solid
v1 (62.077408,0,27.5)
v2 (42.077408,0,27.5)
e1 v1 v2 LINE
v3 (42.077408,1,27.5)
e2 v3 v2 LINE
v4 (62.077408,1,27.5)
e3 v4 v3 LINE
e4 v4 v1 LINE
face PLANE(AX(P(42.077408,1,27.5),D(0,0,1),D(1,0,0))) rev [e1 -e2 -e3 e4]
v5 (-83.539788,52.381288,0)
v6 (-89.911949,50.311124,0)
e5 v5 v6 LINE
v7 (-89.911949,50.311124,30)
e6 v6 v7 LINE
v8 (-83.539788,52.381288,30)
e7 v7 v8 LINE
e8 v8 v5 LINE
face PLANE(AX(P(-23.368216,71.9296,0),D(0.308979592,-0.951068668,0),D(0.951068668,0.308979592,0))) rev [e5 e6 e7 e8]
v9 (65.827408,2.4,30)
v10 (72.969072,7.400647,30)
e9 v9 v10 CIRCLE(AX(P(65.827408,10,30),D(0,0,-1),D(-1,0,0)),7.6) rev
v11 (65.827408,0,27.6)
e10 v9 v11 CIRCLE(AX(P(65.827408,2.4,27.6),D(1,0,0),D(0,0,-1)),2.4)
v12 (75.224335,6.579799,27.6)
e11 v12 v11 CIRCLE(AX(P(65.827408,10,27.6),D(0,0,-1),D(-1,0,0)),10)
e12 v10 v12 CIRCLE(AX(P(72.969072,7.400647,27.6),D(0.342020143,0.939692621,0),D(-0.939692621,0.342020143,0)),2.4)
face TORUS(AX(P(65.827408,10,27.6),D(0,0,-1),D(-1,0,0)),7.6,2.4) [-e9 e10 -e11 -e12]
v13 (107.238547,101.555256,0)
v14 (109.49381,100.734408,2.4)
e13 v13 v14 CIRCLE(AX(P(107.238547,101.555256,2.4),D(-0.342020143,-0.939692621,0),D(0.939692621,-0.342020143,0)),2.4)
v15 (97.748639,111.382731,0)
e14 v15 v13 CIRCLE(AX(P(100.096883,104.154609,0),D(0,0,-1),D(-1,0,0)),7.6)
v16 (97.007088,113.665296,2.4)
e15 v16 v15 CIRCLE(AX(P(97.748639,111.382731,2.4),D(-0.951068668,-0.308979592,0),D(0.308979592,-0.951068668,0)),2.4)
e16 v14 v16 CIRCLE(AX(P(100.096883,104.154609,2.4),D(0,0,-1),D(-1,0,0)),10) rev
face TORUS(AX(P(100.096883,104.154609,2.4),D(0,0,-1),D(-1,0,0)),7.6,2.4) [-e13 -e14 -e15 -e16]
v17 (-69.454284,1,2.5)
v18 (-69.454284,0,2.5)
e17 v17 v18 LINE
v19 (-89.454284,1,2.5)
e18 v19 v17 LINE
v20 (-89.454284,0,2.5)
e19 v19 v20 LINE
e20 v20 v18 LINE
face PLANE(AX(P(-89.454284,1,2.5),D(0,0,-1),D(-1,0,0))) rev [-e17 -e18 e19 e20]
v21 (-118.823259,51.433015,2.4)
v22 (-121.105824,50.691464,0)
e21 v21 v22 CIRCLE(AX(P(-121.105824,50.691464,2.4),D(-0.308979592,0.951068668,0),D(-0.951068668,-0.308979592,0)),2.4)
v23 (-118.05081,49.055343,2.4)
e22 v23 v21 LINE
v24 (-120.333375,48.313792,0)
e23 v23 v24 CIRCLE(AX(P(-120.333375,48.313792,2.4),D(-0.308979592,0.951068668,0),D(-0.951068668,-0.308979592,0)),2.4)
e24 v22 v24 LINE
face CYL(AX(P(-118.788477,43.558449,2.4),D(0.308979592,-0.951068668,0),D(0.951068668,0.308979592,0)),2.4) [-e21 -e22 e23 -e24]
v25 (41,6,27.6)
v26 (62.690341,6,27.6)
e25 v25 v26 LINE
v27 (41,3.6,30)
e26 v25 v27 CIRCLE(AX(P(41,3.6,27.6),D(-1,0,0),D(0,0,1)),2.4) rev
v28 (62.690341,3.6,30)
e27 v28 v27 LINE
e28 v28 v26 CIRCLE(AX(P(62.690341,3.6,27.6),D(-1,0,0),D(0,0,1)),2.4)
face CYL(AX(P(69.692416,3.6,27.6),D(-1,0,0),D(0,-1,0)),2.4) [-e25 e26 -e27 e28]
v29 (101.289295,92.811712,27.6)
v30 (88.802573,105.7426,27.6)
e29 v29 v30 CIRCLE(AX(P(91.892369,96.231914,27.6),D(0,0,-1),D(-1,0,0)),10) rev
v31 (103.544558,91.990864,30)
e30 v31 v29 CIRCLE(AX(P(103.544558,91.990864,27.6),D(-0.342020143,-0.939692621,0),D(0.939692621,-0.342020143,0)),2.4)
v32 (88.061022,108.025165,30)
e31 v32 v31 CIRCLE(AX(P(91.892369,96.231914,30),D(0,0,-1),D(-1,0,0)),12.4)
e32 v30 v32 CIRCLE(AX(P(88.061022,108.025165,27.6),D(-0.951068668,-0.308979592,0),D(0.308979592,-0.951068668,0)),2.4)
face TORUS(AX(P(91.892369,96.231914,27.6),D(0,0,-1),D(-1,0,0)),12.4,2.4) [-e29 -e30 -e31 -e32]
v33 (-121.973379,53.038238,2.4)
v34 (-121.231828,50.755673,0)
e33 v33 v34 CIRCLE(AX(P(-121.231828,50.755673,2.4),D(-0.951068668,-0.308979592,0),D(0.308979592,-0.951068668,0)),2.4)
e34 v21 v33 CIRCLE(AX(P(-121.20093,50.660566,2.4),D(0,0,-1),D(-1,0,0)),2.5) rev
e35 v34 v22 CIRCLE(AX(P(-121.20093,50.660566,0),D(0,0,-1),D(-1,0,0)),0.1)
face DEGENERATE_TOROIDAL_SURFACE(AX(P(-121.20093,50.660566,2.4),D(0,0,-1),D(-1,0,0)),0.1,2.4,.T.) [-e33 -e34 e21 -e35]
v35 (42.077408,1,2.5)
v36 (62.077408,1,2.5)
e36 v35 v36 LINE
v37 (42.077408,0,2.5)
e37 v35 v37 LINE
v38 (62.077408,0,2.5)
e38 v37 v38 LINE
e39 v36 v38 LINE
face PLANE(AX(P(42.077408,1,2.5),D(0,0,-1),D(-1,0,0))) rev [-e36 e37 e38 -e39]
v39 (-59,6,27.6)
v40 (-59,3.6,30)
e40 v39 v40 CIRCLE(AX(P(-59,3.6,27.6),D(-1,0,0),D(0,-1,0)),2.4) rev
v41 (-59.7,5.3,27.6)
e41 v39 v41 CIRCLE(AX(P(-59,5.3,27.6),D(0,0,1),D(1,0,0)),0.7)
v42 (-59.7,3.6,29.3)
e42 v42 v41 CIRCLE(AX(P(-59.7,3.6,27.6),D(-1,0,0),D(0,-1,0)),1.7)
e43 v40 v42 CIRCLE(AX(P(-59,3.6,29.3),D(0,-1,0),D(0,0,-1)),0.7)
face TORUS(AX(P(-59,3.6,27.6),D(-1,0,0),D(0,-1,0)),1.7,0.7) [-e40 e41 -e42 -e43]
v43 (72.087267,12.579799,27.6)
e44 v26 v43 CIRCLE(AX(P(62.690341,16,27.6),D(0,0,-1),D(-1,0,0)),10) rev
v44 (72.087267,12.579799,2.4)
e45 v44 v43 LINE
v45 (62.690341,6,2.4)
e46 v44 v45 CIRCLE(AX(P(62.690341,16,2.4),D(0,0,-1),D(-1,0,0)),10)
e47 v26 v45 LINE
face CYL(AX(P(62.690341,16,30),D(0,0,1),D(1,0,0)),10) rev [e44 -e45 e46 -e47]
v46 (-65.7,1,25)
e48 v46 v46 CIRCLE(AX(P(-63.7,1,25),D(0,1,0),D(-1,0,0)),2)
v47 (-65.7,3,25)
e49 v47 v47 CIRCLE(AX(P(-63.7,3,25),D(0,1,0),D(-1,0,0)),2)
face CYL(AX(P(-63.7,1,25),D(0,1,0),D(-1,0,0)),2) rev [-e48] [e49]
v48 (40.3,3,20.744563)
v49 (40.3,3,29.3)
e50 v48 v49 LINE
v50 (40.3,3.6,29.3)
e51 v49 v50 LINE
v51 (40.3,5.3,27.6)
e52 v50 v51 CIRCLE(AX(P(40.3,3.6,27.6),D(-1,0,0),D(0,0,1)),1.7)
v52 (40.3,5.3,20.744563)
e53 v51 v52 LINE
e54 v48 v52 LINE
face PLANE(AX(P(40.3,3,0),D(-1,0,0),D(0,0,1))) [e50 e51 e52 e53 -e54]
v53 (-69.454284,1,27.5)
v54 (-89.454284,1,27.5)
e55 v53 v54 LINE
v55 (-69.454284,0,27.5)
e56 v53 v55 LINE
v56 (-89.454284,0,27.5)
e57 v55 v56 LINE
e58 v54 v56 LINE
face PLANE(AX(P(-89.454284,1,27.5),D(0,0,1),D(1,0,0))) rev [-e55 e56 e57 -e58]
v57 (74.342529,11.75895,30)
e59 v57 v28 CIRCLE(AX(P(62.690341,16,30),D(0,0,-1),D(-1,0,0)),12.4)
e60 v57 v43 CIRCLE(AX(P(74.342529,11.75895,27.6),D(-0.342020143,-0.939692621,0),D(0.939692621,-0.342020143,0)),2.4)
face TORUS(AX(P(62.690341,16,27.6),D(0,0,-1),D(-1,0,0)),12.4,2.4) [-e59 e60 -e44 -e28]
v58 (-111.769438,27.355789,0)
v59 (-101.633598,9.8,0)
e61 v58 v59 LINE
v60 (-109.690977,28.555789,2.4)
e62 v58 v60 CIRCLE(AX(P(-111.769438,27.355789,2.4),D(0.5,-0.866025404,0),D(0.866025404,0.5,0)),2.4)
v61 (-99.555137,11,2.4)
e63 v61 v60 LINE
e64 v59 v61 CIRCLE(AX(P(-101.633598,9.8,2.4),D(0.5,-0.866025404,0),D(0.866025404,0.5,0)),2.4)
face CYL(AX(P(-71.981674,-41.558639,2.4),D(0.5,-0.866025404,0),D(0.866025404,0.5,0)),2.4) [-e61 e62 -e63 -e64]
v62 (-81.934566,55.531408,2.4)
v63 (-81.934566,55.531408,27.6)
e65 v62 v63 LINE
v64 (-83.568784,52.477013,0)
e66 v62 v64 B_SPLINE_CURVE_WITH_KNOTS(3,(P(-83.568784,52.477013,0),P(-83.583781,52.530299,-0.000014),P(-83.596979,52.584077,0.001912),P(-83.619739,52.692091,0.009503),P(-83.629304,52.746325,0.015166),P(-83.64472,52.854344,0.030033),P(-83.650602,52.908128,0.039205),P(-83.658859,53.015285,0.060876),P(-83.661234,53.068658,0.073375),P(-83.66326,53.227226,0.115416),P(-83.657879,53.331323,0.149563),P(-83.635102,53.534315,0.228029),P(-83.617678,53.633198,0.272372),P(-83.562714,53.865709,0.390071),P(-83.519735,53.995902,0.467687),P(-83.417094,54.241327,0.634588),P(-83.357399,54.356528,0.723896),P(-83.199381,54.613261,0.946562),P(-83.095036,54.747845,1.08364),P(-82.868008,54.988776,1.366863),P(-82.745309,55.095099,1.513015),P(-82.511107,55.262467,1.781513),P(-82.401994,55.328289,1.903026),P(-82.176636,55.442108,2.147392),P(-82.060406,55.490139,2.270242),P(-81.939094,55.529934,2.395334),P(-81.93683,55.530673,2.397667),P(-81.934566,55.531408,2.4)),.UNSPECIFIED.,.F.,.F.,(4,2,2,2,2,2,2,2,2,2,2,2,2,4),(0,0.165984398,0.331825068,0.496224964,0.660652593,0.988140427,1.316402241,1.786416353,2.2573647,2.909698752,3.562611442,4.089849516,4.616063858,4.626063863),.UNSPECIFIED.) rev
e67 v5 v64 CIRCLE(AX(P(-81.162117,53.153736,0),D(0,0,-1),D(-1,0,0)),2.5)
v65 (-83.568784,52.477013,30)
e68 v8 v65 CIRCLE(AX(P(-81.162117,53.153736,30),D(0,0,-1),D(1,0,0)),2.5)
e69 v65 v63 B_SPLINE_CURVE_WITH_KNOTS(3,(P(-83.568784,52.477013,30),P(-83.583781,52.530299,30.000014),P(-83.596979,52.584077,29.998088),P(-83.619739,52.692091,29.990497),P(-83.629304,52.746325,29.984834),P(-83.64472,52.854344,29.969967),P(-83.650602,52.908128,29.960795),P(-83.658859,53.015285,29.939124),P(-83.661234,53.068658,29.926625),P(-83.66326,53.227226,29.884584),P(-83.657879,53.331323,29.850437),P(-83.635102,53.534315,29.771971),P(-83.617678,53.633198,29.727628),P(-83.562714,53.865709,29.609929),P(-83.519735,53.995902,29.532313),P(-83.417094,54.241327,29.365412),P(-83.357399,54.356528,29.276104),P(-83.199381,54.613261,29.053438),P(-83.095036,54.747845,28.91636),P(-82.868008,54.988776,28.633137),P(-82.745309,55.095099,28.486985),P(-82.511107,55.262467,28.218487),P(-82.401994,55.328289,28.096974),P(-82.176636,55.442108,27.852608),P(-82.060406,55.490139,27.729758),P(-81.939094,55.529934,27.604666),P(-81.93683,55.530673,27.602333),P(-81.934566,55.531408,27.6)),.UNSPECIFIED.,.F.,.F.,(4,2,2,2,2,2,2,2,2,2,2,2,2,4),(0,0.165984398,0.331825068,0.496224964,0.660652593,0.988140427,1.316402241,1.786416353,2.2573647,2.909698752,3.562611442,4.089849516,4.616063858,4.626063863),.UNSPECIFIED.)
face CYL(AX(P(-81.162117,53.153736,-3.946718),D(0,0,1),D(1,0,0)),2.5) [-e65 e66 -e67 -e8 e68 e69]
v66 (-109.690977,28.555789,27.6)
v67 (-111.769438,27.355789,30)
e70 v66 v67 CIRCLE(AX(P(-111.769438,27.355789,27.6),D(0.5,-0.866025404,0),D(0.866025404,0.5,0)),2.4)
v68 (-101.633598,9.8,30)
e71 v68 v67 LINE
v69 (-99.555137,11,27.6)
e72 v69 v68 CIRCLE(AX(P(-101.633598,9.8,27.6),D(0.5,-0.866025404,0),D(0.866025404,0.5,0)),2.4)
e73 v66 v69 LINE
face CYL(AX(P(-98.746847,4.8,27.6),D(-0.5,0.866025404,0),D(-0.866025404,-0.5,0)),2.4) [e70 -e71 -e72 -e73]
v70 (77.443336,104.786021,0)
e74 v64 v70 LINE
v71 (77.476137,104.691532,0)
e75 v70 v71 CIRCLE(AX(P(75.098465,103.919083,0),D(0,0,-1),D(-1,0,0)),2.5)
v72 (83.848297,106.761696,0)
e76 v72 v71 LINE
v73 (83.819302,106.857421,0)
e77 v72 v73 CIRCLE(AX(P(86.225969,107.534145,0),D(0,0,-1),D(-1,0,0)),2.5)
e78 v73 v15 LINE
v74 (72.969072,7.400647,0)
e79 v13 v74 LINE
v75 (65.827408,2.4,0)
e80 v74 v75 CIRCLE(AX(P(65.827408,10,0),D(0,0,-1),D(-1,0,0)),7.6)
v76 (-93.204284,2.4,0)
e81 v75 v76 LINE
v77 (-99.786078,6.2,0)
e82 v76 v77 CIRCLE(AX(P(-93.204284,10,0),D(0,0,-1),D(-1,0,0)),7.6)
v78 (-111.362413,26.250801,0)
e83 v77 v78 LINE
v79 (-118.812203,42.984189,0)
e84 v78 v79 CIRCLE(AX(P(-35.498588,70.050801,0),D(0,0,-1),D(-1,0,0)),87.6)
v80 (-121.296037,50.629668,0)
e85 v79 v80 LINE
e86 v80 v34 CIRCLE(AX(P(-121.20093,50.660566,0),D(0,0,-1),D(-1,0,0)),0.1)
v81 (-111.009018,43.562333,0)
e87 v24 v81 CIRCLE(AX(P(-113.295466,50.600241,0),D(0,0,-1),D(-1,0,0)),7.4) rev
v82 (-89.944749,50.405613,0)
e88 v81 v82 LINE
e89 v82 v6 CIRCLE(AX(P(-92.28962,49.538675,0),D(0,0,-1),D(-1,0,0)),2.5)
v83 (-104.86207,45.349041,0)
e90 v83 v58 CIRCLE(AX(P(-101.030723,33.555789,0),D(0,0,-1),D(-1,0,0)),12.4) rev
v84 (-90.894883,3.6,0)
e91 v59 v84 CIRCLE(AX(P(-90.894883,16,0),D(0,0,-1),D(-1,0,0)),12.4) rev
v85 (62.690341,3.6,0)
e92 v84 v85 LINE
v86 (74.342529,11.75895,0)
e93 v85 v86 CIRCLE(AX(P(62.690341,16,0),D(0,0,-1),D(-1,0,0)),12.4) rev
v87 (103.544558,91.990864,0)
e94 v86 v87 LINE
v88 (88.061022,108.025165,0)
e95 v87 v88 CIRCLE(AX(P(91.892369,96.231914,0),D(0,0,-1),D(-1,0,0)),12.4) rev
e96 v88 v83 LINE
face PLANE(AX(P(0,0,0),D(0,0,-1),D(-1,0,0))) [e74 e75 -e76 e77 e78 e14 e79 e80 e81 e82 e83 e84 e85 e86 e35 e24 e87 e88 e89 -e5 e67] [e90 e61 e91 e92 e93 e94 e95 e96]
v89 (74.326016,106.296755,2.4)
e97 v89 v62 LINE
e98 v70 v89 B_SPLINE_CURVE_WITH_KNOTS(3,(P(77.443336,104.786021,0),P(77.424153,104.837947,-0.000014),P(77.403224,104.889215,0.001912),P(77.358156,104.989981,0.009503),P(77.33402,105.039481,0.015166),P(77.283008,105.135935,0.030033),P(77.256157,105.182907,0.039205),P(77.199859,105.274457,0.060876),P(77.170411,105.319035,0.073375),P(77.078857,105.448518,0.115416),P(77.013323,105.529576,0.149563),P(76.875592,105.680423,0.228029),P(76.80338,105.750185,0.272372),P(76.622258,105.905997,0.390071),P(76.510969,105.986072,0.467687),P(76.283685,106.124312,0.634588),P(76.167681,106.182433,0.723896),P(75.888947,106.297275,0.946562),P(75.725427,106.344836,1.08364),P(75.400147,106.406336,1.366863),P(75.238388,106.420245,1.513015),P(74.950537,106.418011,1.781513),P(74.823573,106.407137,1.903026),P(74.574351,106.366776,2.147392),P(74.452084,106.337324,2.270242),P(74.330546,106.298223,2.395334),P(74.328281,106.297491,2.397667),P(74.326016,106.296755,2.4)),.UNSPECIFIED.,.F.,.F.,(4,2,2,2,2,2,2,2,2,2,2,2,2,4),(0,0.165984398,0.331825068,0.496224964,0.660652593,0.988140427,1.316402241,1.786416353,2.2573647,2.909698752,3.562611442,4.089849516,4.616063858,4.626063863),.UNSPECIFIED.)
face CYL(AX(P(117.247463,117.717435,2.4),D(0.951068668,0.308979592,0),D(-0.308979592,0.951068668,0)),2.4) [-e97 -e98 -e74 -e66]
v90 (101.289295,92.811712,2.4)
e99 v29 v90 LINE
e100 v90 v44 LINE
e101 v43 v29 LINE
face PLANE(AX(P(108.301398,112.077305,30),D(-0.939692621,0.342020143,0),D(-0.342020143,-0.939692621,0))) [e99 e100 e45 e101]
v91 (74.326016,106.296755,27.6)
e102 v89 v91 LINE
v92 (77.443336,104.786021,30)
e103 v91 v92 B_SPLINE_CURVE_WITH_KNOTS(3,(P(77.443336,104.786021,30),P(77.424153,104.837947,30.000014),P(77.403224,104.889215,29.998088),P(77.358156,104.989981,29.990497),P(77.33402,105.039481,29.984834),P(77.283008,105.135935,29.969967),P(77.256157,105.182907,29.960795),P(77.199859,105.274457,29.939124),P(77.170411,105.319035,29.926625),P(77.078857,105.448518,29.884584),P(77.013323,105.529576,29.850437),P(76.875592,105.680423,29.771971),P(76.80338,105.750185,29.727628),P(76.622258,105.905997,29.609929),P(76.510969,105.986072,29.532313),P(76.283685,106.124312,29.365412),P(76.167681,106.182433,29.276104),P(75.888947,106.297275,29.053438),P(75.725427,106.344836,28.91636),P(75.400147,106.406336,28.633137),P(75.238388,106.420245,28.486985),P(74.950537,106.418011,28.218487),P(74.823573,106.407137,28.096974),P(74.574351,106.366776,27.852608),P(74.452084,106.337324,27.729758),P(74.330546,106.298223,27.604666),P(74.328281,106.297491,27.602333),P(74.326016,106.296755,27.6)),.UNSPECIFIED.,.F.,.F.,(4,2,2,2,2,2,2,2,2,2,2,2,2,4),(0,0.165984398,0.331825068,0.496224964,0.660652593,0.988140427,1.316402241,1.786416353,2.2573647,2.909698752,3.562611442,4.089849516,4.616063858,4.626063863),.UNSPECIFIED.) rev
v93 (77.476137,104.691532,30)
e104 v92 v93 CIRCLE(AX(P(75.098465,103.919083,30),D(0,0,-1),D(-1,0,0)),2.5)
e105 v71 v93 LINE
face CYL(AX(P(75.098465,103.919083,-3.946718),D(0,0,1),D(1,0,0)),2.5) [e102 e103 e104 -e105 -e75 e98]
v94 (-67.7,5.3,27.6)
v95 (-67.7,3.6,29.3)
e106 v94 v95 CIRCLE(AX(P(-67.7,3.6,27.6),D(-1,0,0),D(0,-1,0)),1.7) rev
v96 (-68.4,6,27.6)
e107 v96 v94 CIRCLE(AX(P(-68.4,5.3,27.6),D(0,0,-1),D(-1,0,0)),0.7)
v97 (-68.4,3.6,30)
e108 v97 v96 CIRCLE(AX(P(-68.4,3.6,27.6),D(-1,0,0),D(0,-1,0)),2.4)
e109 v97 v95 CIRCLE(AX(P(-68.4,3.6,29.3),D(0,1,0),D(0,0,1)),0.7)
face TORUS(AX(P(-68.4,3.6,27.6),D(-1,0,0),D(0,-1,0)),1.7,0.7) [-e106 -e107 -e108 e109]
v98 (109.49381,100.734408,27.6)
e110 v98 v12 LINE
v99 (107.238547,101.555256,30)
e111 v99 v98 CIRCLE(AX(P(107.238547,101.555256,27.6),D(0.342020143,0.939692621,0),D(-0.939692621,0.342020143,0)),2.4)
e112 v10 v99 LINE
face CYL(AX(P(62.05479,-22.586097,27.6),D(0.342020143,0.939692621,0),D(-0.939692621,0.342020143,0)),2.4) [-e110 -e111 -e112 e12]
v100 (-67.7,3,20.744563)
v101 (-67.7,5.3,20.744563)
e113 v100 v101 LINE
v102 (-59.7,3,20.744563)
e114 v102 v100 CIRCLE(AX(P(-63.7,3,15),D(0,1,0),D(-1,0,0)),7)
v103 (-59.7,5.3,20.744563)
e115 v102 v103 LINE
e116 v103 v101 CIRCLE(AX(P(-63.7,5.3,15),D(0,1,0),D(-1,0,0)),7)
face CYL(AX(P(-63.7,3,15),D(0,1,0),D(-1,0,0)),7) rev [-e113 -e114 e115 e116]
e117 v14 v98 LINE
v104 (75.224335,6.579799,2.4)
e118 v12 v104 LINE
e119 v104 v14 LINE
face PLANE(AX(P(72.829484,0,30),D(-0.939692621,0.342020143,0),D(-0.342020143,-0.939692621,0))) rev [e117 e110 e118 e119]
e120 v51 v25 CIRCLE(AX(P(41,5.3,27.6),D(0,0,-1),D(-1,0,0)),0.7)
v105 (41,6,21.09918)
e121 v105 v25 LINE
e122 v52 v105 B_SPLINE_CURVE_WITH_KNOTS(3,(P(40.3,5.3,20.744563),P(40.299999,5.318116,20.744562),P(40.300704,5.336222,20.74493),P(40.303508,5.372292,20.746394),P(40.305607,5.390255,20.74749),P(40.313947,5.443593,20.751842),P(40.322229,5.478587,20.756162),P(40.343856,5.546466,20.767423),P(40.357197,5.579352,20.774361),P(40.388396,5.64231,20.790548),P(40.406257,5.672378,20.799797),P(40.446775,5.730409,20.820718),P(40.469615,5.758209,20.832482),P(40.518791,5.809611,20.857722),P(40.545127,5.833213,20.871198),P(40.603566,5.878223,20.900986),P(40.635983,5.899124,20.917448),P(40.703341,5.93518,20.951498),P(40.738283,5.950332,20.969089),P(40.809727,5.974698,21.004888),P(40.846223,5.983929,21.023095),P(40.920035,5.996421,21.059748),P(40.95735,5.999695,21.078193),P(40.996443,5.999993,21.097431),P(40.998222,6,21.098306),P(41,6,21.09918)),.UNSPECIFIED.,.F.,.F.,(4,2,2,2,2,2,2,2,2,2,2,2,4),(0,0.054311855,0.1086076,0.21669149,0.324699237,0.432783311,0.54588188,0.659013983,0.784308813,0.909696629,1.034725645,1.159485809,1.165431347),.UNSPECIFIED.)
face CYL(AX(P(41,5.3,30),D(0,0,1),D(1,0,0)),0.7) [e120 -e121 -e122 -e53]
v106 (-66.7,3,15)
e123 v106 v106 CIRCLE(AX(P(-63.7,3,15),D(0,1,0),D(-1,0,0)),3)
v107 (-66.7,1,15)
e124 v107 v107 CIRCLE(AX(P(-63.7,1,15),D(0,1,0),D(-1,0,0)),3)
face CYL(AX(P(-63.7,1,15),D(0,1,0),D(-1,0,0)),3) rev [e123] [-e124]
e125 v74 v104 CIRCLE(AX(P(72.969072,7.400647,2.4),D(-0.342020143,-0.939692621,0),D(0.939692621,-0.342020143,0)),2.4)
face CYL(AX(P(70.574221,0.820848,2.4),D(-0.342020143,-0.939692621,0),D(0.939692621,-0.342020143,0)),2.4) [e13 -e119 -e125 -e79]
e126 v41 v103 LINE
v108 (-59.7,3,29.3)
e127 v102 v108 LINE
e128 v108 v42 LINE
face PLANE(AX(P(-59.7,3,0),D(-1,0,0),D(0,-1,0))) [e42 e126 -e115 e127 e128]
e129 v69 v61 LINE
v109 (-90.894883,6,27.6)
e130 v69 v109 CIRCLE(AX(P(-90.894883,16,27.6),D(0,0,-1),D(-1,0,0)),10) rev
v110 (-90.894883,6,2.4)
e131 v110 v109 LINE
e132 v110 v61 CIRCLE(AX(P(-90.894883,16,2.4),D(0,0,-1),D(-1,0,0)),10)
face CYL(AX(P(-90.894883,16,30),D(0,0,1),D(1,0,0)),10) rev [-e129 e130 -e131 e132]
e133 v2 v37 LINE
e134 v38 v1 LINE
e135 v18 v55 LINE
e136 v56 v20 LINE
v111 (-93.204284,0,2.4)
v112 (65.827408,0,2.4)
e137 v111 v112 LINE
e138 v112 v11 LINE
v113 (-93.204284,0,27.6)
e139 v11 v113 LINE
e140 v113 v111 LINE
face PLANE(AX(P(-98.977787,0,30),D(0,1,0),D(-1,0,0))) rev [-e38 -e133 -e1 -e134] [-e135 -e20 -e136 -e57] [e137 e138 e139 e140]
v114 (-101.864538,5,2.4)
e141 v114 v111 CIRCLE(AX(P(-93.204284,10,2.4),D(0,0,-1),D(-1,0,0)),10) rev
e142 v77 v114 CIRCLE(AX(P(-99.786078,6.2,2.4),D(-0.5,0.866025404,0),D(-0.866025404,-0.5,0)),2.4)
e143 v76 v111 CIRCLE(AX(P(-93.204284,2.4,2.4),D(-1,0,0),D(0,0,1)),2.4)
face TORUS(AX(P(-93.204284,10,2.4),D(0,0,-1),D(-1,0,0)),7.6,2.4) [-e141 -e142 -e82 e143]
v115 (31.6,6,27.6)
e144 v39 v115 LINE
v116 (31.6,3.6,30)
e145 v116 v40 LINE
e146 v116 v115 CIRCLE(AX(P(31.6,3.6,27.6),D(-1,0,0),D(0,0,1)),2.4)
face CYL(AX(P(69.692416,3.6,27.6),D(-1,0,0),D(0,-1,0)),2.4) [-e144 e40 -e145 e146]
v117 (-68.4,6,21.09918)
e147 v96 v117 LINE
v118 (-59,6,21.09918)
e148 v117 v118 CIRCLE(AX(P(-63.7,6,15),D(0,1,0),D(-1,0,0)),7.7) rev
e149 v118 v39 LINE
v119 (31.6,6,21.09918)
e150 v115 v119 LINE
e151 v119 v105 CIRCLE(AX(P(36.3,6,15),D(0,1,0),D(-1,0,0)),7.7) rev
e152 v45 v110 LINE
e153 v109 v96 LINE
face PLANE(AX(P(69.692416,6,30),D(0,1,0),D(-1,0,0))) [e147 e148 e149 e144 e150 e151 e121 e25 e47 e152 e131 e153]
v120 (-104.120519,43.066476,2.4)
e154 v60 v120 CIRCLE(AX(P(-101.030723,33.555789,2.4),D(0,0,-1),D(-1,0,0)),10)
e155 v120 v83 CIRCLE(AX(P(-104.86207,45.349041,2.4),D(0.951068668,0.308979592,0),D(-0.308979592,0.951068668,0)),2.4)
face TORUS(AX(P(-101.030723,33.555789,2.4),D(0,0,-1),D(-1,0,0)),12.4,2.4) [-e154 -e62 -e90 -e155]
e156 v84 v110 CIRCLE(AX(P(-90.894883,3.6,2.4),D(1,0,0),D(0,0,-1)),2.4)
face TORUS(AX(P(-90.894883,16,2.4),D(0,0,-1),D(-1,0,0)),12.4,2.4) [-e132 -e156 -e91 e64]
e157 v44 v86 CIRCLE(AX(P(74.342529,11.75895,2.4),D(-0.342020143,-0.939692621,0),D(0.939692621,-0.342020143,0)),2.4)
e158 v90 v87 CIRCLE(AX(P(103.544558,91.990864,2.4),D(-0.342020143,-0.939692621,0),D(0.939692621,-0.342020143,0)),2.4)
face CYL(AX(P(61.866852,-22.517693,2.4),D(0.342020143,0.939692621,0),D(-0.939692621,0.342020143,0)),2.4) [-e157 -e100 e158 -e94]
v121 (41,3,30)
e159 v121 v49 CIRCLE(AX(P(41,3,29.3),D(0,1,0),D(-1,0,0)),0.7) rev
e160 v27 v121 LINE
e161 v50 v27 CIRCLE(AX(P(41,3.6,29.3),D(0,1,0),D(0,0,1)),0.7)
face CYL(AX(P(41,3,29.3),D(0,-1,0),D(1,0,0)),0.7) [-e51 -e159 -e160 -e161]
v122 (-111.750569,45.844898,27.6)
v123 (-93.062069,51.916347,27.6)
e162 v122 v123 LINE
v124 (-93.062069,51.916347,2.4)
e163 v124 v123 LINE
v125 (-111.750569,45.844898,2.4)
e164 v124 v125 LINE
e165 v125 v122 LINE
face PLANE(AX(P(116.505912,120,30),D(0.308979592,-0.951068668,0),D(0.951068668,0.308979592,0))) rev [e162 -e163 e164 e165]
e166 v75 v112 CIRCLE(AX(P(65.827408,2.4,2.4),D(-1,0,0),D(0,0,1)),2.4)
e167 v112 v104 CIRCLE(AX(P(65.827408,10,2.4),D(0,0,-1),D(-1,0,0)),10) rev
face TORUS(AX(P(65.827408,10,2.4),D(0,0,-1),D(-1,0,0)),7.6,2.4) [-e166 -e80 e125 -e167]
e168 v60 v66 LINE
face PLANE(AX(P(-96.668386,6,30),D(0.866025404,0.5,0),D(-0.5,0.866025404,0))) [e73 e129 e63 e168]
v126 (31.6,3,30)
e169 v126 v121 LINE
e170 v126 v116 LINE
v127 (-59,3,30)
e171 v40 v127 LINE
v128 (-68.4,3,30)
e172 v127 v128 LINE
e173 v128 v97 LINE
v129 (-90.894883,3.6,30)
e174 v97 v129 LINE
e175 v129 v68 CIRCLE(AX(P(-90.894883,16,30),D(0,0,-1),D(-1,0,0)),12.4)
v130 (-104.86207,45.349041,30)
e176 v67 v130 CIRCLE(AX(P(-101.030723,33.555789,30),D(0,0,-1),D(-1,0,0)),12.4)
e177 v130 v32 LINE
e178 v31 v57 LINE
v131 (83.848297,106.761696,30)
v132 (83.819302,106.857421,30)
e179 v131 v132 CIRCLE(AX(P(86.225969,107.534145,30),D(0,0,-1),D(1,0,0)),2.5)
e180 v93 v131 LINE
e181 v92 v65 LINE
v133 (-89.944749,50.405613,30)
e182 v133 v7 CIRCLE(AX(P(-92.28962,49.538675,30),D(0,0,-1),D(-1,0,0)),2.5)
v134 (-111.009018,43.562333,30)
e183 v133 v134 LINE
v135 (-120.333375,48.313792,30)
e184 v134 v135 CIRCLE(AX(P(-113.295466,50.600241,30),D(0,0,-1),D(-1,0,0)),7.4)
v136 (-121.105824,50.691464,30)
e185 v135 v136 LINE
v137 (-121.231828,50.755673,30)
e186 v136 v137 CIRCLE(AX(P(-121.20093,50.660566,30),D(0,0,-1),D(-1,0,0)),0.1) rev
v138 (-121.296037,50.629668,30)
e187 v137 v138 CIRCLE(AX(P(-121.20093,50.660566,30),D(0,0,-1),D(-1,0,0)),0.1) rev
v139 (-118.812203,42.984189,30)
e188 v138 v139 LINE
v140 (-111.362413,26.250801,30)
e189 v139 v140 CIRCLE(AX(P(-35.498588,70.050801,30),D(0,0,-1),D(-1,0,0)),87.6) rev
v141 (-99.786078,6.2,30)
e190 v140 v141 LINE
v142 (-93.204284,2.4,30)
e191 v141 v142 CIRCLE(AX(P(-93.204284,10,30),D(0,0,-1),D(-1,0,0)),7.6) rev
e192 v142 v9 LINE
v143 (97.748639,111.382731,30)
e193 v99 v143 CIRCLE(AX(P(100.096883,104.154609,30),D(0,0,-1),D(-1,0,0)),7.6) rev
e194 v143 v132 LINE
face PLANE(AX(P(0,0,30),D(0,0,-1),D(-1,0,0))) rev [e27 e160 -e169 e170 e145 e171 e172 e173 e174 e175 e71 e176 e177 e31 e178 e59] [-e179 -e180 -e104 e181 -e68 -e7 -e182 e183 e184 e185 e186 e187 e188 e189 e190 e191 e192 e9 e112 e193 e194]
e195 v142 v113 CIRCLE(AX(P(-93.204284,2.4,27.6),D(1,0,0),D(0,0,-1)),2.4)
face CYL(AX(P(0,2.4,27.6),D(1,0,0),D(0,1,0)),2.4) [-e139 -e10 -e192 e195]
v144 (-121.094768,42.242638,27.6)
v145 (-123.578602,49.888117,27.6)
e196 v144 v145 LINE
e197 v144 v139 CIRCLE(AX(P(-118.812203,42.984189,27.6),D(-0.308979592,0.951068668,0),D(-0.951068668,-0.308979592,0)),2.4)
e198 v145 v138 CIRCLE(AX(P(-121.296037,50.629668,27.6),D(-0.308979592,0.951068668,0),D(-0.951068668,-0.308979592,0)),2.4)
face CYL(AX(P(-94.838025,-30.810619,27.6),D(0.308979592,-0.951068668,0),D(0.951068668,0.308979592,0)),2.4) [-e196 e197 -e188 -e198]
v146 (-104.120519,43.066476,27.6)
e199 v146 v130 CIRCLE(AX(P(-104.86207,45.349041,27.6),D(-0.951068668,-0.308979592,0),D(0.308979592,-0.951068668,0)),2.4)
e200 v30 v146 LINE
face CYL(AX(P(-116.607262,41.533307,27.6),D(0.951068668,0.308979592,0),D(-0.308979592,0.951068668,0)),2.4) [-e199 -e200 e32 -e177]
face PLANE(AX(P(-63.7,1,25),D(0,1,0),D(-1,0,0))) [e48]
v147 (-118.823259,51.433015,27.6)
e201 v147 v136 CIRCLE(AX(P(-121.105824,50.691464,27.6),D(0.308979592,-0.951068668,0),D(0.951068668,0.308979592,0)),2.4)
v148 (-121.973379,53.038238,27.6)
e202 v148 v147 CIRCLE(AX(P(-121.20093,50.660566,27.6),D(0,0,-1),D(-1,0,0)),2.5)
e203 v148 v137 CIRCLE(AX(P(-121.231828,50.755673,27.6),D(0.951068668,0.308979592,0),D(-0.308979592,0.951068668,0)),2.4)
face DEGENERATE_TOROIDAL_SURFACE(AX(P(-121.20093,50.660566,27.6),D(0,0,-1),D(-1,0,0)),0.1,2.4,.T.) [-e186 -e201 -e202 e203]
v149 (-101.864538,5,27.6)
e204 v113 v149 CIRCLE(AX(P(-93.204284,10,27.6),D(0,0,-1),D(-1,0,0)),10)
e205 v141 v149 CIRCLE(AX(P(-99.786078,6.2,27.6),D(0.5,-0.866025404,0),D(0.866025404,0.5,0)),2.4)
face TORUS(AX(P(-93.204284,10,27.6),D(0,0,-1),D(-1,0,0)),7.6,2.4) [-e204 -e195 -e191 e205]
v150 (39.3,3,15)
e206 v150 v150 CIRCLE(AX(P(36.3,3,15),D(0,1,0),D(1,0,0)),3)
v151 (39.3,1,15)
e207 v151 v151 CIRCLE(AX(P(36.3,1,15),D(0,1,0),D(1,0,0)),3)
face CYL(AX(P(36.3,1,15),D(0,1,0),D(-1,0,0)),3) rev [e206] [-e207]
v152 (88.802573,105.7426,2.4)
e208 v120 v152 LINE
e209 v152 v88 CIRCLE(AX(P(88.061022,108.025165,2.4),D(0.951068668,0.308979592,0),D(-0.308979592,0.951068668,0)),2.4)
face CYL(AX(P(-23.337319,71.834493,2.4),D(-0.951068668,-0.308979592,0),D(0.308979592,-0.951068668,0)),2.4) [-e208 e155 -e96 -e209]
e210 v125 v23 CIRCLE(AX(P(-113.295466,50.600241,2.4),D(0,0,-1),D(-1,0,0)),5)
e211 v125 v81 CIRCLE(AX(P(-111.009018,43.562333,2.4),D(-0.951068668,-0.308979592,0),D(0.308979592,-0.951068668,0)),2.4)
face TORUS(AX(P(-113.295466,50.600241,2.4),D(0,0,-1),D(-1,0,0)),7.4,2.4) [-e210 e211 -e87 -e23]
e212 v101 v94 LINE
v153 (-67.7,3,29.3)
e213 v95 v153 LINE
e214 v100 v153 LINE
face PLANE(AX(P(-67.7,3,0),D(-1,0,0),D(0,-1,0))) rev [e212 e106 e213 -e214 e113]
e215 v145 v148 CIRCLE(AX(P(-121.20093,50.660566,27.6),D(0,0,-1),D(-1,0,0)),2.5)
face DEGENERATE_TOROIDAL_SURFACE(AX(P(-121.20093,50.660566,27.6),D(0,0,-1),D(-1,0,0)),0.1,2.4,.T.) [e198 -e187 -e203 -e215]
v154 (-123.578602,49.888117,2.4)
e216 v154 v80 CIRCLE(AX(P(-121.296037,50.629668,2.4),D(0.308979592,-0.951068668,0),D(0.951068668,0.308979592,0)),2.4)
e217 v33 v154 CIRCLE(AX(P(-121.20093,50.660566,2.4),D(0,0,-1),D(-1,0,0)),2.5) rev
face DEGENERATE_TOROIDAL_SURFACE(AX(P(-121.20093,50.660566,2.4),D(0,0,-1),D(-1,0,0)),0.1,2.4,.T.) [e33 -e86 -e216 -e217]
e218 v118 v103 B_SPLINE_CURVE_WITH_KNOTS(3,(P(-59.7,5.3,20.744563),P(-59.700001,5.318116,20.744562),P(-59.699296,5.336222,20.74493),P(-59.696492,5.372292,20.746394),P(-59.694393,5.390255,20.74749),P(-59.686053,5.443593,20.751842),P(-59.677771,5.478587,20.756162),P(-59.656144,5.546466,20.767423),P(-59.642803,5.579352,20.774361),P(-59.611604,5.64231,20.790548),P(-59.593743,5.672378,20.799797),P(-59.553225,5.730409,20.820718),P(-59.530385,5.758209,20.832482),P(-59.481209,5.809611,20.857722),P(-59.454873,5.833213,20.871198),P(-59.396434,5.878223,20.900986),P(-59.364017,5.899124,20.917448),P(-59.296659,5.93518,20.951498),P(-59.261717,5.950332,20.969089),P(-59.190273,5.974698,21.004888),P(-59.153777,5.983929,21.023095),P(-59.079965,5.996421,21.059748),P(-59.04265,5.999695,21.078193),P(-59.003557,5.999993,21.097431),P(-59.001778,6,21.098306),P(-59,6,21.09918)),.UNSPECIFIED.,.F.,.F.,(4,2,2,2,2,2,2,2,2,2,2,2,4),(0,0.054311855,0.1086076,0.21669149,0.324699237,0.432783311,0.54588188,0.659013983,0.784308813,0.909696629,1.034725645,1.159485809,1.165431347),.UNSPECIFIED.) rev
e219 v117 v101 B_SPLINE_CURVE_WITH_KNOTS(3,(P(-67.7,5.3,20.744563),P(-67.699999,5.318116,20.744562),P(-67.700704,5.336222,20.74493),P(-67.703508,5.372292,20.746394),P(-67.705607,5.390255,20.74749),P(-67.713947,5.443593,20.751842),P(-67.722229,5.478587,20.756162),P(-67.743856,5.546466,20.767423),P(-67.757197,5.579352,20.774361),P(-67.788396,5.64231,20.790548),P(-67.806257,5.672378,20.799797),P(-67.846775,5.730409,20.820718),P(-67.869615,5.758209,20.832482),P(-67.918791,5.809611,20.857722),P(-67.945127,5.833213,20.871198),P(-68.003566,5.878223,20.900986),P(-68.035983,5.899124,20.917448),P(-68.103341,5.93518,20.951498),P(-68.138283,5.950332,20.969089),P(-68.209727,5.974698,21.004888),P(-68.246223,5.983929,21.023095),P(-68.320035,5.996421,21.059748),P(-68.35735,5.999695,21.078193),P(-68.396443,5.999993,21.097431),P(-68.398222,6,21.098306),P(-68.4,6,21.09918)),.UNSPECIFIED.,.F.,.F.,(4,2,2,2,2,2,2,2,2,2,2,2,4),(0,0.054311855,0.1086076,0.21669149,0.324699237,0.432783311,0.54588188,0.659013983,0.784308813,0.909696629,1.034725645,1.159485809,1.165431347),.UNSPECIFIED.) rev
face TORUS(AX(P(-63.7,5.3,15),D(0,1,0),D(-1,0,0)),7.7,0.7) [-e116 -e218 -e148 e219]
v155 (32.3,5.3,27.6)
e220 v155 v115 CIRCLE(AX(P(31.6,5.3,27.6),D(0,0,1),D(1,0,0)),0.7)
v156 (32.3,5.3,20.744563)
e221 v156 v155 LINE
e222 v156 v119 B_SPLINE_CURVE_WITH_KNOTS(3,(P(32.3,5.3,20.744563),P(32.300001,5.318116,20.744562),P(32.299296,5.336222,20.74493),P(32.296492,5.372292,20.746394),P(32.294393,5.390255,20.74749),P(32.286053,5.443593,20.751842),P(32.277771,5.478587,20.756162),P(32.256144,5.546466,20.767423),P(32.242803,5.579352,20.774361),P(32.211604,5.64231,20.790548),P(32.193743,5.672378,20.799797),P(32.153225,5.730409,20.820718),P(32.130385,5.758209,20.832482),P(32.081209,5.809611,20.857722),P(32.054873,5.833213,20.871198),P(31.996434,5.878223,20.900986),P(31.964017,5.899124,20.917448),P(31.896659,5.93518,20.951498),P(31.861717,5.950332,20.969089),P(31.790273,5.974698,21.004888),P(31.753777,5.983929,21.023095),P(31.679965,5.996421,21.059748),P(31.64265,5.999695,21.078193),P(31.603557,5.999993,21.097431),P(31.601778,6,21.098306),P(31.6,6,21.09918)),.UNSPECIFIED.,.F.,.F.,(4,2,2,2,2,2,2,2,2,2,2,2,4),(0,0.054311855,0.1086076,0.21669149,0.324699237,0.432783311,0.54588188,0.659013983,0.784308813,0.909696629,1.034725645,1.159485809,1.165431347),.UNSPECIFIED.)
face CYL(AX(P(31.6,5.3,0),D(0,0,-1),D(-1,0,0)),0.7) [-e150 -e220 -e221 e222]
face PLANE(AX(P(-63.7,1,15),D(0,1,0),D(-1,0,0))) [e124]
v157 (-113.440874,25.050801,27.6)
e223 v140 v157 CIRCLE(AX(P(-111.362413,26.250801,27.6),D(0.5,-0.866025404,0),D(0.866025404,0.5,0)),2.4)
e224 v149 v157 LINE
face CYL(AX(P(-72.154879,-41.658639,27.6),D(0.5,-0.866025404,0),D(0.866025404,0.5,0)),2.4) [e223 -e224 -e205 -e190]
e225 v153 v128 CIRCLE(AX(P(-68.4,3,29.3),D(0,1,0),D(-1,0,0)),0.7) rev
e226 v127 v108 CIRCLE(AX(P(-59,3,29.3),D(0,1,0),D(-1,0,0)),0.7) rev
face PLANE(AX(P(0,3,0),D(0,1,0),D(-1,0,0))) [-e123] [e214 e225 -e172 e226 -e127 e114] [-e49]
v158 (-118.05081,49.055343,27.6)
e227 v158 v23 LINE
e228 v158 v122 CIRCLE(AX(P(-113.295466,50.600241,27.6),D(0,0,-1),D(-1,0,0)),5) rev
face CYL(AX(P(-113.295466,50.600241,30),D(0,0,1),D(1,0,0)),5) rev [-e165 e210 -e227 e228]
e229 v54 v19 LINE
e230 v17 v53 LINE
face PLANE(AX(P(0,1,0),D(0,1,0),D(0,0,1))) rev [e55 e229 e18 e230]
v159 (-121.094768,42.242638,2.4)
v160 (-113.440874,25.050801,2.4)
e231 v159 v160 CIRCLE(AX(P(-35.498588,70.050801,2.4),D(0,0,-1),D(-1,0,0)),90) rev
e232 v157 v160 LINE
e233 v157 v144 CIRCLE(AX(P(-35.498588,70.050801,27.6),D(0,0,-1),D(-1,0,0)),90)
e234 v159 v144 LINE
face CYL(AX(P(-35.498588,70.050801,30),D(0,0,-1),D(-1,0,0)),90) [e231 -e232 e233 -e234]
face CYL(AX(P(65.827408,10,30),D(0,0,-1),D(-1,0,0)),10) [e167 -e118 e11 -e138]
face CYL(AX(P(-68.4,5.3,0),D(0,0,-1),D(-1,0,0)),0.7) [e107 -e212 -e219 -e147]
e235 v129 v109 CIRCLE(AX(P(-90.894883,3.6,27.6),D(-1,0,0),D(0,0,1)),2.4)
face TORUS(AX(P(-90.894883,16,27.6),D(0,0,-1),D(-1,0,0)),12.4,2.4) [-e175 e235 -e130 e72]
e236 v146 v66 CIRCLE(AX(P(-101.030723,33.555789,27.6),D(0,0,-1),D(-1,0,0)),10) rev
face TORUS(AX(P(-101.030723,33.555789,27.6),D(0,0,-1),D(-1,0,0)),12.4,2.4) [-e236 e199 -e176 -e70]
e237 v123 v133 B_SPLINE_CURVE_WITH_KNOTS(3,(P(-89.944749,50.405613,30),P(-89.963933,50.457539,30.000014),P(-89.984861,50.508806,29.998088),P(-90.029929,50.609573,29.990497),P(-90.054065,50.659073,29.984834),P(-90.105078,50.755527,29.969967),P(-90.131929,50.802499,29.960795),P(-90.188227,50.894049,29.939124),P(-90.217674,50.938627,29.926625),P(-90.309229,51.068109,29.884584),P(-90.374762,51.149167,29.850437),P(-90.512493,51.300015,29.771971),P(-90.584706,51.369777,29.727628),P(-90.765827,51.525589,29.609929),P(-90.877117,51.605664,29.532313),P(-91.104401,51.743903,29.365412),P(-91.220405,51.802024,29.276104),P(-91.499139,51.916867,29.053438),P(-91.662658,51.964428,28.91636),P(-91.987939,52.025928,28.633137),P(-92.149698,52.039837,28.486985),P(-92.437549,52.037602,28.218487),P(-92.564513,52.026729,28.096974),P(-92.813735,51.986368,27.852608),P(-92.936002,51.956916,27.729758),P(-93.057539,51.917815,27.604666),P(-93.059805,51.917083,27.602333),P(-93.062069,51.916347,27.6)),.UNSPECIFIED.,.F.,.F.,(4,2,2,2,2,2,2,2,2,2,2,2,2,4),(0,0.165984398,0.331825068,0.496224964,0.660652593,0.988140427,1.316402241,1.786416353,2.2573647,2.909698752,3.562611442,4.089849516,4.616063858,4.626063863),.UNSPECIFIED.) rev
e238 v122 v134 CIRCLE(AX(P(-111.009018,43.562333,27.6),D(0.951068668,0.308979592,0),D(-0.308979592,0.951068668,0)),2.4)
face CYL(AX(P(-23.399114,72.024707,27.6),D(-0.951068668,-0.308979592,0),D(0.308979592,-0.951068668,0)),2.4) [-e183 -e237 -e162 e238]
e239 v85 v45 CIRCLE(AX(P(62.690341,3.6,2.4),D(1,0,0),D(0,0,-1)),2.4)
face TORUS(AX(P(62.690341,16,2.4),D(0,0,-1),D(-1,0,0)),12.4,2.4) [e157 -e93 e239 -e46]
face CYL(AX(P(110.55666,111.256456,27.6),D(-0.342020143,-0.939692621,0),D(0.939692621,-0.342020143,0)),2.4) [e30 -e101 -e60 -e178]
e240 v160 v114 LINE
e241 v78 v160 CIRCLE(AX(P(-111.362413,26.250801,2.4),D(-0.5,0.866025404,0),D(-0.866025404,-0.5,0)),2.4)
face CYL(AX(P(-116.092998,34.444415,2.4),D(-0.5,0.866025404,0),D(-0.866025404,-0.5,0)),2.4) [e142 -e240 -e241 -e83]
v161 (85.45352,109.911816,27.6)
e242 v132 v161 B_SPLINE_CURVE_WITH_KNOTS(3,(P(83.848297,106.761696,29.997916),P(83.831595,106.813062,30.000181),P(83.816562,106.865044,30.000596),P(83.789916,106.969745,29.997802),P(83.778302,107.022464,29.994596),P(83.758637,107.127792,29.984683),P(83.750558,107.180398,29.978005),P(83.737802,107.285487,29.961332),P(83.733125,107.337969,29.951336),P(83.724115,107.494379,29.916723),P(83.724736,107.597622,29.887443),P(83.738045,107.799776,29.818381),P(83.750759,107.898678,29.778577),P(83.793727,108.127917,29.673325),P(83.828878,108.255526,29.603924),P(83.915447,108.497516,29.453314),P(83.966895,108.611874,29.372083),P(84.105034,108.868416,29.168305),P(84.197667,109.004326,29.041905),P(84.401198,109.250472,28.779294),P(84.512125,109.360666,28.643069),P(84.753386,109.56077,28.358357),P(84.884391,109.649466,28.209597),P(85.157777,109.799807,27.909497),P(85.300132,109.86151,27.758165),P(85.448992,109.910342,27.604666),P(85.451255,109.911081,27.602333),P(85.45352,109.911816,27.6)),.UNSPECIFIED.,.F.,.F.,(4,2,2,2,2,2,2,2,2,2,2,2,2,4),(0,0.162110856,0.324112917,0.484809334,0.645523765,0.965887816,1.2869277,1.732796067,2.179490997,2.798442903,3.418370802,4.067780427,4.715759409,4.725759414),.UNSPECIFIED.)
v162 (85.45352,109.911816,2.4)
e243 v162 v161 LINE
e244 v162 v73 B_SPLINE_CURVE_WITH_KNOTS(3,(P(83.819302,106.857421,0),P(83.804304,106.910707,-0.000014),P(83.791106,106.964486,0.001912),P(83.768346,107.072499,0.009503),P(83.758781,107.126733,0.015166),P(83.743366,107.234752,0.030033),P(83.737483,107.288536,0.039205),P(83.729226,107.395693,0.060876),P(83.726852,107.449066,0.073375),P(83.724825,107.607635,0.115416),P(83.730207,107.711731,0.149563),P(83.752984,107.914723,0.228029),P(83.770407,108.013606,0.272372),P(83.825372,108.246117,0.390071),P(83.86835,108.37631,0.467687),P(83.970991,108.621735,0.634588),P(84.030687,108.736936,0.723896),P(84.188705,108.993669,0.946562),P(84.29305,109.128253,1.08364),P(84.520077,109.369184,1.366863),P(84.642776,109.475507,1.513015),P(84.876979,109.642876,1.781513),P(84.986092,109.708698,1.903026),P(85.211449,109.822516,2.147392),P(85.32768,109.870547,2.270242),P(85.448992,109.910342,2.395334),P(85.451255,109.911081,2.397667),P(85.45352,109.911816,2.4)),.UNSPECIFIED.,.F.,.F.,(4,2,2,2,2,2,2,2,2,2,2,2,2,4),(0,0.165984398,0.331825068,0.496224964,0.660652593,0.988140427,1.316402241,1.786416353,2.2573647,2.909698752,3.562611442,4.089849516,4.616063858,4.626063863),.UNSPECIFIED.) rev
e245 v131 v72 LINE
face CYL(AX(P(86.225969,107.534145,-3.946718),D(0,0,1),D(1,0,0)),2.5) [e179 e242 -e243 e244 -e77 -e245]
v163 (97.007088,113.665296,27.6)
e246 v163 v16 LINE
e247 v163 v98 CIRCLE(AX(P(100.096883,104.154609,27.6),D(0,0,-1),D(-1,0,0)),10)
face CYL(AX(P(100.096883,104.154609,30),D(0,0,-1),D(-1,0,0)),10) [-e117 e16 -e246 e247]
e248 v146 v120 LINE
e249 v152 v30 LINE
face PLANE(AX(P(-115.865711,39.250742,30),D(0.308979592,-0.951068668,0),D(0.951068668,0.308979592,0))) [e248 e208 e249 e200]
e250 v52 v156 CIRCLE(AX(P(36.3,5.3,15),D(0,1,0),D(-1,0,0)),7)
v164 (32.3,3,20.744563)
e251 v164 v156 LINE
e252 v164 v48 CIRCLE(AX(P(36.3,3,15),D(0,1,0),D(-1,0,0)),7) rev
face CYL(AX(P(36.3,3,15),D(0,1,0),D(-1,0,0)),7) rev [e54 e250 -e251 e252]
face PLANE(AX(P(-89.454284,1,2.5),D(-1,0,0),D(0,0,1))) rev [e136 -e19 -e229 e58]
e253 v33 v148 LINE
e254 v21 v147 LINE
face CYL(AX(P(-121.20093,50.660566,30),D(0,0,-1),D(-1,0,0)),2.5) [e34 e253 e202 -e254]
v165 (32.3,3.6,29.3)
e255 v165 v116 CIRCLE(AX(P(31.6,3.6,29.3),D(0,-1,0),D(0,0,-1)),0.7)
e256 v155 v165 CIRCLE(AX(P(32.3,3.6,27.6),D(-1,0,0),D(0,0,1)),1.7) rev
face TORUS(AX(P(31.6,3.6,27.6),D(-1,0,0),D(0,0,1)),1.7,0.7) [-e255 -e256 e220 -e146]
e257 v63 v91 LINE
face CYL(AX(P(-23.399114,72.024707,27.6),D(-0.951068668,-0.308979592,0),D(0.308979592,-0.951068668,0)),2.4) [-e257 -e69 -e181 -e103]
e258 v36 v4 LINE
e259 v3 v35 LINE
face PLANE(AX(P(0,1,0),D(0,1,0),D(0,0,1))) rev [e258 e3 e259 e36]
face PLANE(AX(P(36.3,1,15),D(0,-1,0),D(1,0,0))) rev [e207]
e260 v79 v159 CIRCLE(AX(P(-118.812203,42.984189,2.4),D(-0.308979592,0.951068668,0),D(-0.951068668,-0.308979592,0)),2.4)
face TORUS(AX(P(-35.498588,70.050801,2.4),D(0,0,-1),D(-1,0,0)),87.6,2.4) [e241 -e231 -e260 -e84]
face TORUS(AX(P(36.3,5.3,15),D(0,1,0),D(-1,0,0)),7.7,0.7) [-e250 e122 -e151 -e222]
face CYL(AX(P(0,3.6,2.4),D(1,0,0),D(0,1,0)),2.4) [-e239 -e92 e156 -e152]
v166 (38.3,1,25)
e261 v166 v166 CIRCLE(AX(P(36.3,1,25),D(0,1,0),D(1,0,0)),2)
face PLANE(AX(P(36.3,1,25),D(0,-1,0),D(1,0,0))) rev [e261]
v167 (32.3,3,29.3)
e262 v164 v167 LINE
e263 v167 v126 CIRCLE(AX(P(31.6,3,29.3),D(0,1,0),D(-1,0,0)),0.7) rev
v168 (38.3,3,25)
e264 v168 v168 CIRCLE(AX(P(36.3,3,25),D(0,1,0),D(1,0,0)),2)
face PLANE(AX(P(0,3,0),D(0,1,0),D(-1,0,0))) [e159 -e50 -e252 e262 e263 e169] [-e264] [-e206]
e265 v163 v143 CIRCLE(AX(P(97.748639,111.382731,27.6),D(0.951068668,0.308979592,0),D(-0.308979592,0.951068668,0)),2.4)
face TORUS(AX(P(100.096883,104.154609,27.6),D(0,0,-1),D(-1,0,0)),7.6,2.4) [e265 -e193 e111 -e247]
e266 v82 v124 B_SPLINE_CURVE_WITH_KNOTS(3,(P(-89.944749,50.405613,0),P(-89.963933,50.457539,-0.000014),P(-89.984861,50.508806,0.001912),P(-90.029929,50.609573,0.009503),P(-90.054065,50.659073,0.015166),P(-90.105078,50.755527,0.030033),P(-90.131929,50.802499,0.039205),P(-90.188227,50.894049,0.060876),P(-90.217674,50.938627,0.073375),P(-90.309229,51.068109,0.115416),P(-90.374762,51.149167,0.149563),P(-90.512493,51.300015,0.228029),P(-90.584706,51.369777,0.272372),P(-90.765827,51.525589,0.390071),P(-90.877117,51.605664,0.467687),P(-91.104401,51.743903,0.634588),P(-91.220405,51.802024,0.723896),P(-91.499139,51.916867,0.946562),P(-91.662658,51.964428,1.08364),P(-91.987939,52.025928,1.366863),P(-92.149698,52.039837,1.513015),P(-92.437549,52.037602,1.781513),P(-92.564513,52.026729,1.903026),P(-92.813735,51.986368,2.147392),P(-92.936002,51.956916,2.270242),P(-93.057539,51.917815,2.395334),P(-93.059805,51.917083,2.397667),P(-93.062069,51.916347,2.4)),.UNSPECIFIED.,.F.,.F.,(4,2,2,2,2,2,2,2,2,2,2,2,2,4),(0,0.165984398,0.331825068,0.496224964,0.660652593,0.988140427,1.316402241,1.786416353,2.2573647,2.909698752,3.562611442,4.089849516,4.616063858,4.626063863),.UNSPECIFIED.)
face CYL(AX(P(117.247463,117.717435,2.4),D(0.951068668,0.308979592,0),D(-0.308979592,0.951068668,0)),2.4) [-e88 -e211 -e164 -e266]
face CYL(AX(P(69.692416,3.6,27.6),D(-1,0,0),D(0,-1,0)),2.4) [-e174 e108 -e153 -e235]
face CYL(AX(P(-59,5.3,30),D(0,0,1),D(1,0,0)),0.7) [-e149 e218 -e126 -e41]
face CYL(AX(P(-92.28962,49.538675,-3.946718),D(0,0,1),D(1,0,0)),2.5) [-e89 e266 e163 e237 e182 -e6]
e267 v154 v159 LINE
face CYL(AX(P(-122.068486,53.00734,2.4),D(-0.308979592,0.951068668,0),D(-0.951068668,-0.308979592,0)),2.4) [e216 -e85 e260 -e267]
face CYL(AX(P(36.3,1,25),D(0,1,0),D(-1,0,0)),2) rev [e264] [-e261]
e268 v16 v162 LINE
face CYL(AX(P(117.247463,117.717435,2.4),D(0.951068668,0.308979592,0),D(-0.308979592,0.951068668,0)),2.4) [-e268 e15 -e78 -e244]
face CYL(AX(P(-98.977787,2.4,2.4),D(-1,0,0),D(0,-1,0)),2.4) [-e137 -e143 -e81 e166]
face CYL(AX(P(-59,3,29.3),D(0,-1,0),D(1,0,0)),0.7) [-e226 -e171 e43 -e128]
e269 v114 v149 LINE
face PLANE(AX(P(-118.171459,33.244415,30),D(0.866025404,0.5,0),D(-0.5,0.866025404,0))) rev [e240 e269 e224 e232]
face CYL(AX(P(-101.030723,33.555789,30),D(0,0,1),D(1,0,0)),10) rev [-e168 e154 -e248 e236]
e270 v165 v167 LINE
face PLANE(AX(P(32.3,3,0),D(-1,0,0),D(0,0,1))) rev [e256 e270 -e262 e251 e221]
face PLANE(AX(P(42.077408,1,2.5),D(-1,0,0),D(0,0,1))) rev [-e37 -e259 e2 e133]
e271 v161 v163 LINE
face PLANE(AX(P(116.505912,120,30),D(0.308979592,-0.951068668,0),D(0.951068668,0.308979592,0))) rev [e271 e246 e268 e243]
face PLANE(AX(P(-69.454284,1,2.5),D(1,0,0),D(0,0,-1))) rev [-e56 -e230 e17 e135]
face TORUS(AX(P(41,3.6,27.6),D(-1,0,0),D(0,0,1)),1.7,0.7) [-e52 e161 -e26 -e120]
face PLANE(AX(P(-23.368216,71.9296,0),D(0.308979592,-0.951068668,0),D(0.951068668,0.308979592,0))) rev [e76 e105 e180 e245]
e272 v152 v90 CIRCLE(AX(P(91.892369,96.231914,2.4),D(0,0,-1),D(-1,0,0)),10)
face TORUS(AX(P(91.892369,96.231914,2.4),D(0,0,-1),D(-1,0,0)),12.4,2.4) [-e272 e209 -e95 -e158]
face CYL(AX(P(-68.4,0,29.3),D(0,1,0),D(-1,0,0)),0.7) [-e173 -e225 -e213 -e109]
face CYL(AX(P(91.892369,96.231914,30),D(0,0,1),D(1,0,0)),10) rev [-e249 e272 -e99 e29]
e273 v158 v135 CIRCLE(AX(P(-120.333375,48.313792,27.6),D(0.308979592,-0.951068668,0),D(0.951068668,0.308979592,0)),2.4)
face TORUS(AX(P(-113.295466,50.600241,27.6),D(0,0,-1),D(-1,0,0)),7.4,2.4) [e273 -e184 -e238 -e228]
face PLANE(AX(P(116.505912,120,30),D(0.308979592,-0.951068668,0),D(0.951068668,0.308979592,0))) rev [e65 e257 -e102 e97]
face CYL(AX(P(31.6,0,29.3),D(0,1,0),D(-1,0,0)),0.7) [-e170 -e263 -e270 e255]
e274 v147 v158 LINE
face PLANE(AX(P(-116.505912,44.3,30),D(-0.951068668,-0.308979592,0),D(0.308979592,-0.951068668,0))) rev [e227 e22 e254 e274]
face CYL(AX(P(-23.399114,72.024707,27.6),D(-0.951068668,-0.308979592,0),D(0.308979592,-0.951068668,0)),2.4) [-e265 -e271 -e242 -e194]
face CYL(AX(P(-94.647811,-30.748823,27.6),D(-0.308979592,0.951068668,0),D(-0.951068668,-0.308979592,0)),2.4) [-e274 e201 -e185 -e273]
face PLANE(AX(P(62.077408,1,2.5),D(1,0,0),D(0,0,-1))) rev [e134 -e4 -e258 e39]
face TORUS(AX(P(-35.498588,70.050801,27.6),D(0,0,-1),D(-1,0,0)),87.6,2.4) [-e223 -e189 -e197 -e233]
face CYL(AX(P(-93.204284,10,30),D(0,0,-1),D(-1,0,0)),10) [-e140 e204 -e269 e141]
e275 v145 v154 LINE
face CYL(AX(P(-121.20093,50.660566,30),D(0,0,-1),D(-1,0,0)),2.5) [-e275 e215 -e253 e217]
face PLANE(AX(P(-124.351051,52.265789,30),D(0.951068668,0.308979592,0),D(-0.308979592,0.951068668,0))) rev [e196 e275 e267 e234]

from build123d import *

# Parameters (mm, degrees)
BOSS_EXTRUDE1_DEPTH = 30
FILLET1_R           = 10
FILLET2_R           = 90
FILLET3_R           = 2.5
FILLET4_R           = 5
FILLET6_R           = 2.4
SKETCH17_W          = 20
SKETCH17_H          = 25
CUT_EXTRUDE4_DEPTH  = 1
SKETCH15_W          = 6.7
SKETCH15_H          = 30
CUT_EXTRUDE2_DEPTH  = 2.5
CUT_EXTRUDE3_START  = -30
CUT_EXTRUDE3_DEPTH  = 30.000005
SKETCH14_W          = 8
SKETCH14_H          = 2.4
CUT_EXTRUDE1_DEPTH  = 3
SKETCH18_R          = 3
SKETCH18_R_2        = 2
CUT_EXTRUDE5_DEPTH  = 2
FILLET5_R           = 0.7


with BuildPart() as part:
    # Sketch13 → Boss-Extrude1 (new body)
    with BuildSketch(Plane.XY):
        Polygon((-98.977787134, 0), (72.829483755, 0), (116.505911867, 120), (-116.505911867, 44.3), (-119.595707786, 53.810686683), (-124.351051127, 52.265788724), (-118.17145929, 33.244415358), align=None)
        Polygon((-115.865710961, 39.250742102), (108.301397672, 112.077304512), (69.692416298, 6), (-96.668386058, 6), align=None, mode=Mode.SUBTRACT)
    extrude(amount=BOSS_EXTRUDE1_DEPTH)

    # Fillet1
    fillet1_edges = [part.edges().sort_by_distance(p)[0] for p in [
        (116.505911867, 120, 15),
        (72.829483755, 0, 15),
        (-98.977787134, 0, 15),
        (-115.865710961, 39.250742102, 15),
        (-96.668386058, 6, 15),
        (69.692416298, 6, 15),
        (108.301397672, 112.077304512, 15),
    ]]
    fillet(fillet1_edges, radius=FILLET1_R)

    # Fillet2
    fillet2_edges = [part.edges().sort_by_distance(p)[0] for p in [
        (-118.17145929, 33.244415358, 15),
    ]]
    fillet(fillet2_edges, radius=FILLET2_R)

    # Fillet3
    fillet3_edges = [part.edges().sort_by_distance(p)[0] for p in [
        (-119.595707786, 53.810686683, 15),
        (-124.351051127, 52.265788724, 15),
    ]]
    fillet(fillet3_edges, radius=FILLET3_R - 0.0001)  # a hair under: the kernel refuses the full size

    # Fillet4
    fillet4_edges = [part.edges().sort_by_distance(p)[0] for p in [
        (-116.505911867, 44.3, 15),
    ]]
    fillet(fillet4_edges, radius=FILLET4_R)

    # Fillet6
    fillet6_edges = [part.edges().sort_by_distance(p)[0] for p in [
        (-118.437049765, 50.24422673, 0),
        (-118.437049765, 50.24422673, 30),
        (-115.565594185, 46.145297954, 0),
        (-115.565594185, 46.145297954, 30),
        (-7.65897272, 74.404537963, 0),
        (-7.65897272, 74.404537963, 30),
        (-104.623057163, 19.777894512, 0),
        (-104.623057163, 19.777894512, 30),
        (-13.688438035, 0, 0),
        (-13.688438035, 0, 30),
        (-7.371740484, 79.755096833, 0),
        (92.359072133, 53.657103079, 0),
        (-14.102271225, 6, 0),
        (86.688281307, 52.695755335, 0),
        (71.563172737, 1.808479557, 0),
        (-98.204284443, 1.339745962, 0),
        (92.359072133, 53.657103079, 30),
        (-7.371740484, 79.755096833, 30),
        (86.688281307, 52.695755335, 30),
        (-14.102271225, 6, 30),
        (71.563172737, 1.808479557, 30),
        (-98.204284443, 1.339745962, 30),
        (-110.36645668, 37.139652094, 0),
        (-110.36645668, 37.139652094, 30),
        (-95.894883366, 7.339745962, 0),
        (-95.894883366, 7.339745962, 30),
        (68.42610528, 7.808479557, 0),
        (68.42610528, 7.808479557, 30),
        (99.085903878, 103.178355791, 0),
        (99.085903878, 103.178355791, 30),
        (107.290418073, 111.101051279, 0),
        (107.290418073, 111.101051279, 30),
        (-107.652706274, 15.0254007, 0),
        (-107.652706274, 15.0254007, 30),
        (-117.718398708, 33.446120251, 0),
        (-117.718398708, 33.446120251, 30),
        (-122.336700459, 46.065425148, 0),
        (-123.428439056, 51.795648689, 0),
        (-120.06584782, 52.888074612, 0),
        (-122.336700459, 46.065425148, 30),
        (-123.428439056, 51.795648689, 30),
        (-120.06584782, 52.888074612, 30),
    ]]
    fillet(fillet6_edges, radius=FILLET6_R)

    # Sketch17 → Cut-Extrude4 (cut)
    with BuildSketch(Plane.XZ):
        with Locations((-79.454284443, 15)):
            Rectangle(SKETCH17_W, SKETCH17_H)
        with Locations((52.077408373, 15)):
            Rectangle(SKETCH17_W, SKETCH17_H)
    extrude(amount=-CUT_EXTRUDE4_DEPTH, mode=Mode.SUBTRACT)

    # Sketch15 → Cut-Extrude2 (cut)
    with BuildSketch(Plane(origin=(-24.140665455, 74.307271912, 0), x_dir=(0.9510686683034012, 0.3089795918367347, 0), z_dir=(-0.3089795918367347, 0.9510686683034012, 0))):
        with Locations((-66.617326531, -15)):
            Rectangle(SKETCH15_W, SKETCH15_H)
        with Locations((109.382673469, -15)):
            Rectangle(SKETCH15_W, SKETCH15_H)
    extrude(amount=-CUT_EXTRUDE2_DEPTH, mode=Mode.SUBTRACT)

    # Sketch16 → Cut-Extrude3 (cut)
    with BuildSketch(Plane.XY.offset(30).offset(CUT_EXTRUDE3_START)):
        with BuildLine():
            Line((74.326016428, 106.296755102), (76.703688099, 107.069204082))
            Line((76.703688099, 107.069204082), (77.476137078, 104.691532411))
            ThreePointArc((77.476137078, 104.691532411), (76.233529258, 106.146555105), (74.326016428, 106.296755102))
        make_face()
        with BuildLine():
            Line((83.075848176, 109.139367347), (83.848297156, 106.761695676))
            ThreePointArc((83.848297156, 106.761695676), (83.998497153, 108.669208506), (85.453519847, 109.911816327))
            Line((85.453519847, 109.911816327), (83.075848176, 109.139367347))
        make_face()
        with BuildLine():
            Line((-90.684397523, 52.688795918), (-89.911948543, 50.311124248))
            ThreePointArc((-89.911948543, 50.311124248), (-91.154556364, 51.766146941), (-93.062069193, 51.916346939))
            Line((-93.062069193, 51.916346939), (-90.684397523, 52.688795918))
        make_face()
        with BuildLine():
            Line((-81.934565774, 55.531408163), (-84.312237445, 54.758959184))
            Line((-84.312237445, 54.758959184), (-83.539788466, 52.381287513))
            ThreePointArc((-83.539788466, 52.381287513), (-83.389588468, 54.288800343), (-81.934565774, 55.531408163))
        make_face()
    extrude(amount=CUT_EXTRUDE3_DEPTH, mode=Mode.SUBTRACT)

    # Sketch14 → Cut-Extrude1 (cut)
    with BuildSketch(Plane(origin=(0, 6, 0), x_dir=(1, 0, 0), z_dir=(0, 1, 0))):
        with Locations((36.3, -28.8)):
            Rectangle(SKETCH14_W, SKETCH14_H)
        with BuildLine():
            Line((32.3, -20.744562647), (32.3, -27.6))
            Line((32.3, -27.6), (40.3, -27.6))
            Line((40.3, -27.6), (40.3, -20.744562647))
            ThreePointArc((40.3, -20.744562647), (36.3, -8), (32.3, -20.744562647))
        make_face()
        with Locations((-63.7, -28.8)):
            Rectangle(SKETCH14_W, SKETCH14_H)
        with BuildLine():
            ThreePointArc((-59.7, -20.744562647), (-63.7, -8), (-67.7, -20.744562647))
            Line((-67.7, -20.744562647), (-67.7, -27.6))
            Line((-67.7, -27.6), (-59.7, -27.6))
            Line((-59.7, -27.6), (-59.7, -20.744562647))
        make_face()
    extrude(amount=-CUT_EXTRUDE1_DEPTH, mode=Mode.SUBTRACT)

    # Sketch18 → Cut-Extrude5 (cut)
    with BuildSketch(Plane(origin=(0, 3, 0), x_dir=(1, 0, 0), z_dir=(0, 1, 0))):
        with Locations(Location((-63.7, -15, 0), (0, 0, 180))):
            Circle(SKETCH18_R)
        with Locations(Location((-63.7, -25, 0), (0, 0, 180))):
            Circle(SKETCH18_R_2)
        with Locations((36.3, -25)):
            Circle(SKETCH18_R_2)
        with Locations((36.3, -15)):
            Circle(SKETCH18_R)
    extrude(amount=-CUT_EXTRUDE5_DEPTH, mode=Mode.SUBTRACT)

    # Fillet5
    fillet5_edges = [part.edges().sort_by_distance(p)[0] for p in [
        (-59.7, 5.297056275, 29.297056275),
        (-67.7, 5.297056275, 29.297056275),
        (32.3, 5.297056275, 29.297056275),
        (40.3, 5.297056275, 29.297056275),
        (32.3, 6, 24.172281323),
        (40.3, 6, 24.172281323),
        (40.3, 3.3, 30),
        (32.3, 3.3, 30),
        (36.3, 6, 8),
        (-67.7, 6, 24.172281323),
        (-63.7, 6, 8),
        (-59.7, 3.3, 30),
        (-67.7, 3.3, 30),
        (-59.7, 6, 24.172281323),
    ]]
    fillet(fillet5_edges, radius=FILLET5_R)


solid = part.part
